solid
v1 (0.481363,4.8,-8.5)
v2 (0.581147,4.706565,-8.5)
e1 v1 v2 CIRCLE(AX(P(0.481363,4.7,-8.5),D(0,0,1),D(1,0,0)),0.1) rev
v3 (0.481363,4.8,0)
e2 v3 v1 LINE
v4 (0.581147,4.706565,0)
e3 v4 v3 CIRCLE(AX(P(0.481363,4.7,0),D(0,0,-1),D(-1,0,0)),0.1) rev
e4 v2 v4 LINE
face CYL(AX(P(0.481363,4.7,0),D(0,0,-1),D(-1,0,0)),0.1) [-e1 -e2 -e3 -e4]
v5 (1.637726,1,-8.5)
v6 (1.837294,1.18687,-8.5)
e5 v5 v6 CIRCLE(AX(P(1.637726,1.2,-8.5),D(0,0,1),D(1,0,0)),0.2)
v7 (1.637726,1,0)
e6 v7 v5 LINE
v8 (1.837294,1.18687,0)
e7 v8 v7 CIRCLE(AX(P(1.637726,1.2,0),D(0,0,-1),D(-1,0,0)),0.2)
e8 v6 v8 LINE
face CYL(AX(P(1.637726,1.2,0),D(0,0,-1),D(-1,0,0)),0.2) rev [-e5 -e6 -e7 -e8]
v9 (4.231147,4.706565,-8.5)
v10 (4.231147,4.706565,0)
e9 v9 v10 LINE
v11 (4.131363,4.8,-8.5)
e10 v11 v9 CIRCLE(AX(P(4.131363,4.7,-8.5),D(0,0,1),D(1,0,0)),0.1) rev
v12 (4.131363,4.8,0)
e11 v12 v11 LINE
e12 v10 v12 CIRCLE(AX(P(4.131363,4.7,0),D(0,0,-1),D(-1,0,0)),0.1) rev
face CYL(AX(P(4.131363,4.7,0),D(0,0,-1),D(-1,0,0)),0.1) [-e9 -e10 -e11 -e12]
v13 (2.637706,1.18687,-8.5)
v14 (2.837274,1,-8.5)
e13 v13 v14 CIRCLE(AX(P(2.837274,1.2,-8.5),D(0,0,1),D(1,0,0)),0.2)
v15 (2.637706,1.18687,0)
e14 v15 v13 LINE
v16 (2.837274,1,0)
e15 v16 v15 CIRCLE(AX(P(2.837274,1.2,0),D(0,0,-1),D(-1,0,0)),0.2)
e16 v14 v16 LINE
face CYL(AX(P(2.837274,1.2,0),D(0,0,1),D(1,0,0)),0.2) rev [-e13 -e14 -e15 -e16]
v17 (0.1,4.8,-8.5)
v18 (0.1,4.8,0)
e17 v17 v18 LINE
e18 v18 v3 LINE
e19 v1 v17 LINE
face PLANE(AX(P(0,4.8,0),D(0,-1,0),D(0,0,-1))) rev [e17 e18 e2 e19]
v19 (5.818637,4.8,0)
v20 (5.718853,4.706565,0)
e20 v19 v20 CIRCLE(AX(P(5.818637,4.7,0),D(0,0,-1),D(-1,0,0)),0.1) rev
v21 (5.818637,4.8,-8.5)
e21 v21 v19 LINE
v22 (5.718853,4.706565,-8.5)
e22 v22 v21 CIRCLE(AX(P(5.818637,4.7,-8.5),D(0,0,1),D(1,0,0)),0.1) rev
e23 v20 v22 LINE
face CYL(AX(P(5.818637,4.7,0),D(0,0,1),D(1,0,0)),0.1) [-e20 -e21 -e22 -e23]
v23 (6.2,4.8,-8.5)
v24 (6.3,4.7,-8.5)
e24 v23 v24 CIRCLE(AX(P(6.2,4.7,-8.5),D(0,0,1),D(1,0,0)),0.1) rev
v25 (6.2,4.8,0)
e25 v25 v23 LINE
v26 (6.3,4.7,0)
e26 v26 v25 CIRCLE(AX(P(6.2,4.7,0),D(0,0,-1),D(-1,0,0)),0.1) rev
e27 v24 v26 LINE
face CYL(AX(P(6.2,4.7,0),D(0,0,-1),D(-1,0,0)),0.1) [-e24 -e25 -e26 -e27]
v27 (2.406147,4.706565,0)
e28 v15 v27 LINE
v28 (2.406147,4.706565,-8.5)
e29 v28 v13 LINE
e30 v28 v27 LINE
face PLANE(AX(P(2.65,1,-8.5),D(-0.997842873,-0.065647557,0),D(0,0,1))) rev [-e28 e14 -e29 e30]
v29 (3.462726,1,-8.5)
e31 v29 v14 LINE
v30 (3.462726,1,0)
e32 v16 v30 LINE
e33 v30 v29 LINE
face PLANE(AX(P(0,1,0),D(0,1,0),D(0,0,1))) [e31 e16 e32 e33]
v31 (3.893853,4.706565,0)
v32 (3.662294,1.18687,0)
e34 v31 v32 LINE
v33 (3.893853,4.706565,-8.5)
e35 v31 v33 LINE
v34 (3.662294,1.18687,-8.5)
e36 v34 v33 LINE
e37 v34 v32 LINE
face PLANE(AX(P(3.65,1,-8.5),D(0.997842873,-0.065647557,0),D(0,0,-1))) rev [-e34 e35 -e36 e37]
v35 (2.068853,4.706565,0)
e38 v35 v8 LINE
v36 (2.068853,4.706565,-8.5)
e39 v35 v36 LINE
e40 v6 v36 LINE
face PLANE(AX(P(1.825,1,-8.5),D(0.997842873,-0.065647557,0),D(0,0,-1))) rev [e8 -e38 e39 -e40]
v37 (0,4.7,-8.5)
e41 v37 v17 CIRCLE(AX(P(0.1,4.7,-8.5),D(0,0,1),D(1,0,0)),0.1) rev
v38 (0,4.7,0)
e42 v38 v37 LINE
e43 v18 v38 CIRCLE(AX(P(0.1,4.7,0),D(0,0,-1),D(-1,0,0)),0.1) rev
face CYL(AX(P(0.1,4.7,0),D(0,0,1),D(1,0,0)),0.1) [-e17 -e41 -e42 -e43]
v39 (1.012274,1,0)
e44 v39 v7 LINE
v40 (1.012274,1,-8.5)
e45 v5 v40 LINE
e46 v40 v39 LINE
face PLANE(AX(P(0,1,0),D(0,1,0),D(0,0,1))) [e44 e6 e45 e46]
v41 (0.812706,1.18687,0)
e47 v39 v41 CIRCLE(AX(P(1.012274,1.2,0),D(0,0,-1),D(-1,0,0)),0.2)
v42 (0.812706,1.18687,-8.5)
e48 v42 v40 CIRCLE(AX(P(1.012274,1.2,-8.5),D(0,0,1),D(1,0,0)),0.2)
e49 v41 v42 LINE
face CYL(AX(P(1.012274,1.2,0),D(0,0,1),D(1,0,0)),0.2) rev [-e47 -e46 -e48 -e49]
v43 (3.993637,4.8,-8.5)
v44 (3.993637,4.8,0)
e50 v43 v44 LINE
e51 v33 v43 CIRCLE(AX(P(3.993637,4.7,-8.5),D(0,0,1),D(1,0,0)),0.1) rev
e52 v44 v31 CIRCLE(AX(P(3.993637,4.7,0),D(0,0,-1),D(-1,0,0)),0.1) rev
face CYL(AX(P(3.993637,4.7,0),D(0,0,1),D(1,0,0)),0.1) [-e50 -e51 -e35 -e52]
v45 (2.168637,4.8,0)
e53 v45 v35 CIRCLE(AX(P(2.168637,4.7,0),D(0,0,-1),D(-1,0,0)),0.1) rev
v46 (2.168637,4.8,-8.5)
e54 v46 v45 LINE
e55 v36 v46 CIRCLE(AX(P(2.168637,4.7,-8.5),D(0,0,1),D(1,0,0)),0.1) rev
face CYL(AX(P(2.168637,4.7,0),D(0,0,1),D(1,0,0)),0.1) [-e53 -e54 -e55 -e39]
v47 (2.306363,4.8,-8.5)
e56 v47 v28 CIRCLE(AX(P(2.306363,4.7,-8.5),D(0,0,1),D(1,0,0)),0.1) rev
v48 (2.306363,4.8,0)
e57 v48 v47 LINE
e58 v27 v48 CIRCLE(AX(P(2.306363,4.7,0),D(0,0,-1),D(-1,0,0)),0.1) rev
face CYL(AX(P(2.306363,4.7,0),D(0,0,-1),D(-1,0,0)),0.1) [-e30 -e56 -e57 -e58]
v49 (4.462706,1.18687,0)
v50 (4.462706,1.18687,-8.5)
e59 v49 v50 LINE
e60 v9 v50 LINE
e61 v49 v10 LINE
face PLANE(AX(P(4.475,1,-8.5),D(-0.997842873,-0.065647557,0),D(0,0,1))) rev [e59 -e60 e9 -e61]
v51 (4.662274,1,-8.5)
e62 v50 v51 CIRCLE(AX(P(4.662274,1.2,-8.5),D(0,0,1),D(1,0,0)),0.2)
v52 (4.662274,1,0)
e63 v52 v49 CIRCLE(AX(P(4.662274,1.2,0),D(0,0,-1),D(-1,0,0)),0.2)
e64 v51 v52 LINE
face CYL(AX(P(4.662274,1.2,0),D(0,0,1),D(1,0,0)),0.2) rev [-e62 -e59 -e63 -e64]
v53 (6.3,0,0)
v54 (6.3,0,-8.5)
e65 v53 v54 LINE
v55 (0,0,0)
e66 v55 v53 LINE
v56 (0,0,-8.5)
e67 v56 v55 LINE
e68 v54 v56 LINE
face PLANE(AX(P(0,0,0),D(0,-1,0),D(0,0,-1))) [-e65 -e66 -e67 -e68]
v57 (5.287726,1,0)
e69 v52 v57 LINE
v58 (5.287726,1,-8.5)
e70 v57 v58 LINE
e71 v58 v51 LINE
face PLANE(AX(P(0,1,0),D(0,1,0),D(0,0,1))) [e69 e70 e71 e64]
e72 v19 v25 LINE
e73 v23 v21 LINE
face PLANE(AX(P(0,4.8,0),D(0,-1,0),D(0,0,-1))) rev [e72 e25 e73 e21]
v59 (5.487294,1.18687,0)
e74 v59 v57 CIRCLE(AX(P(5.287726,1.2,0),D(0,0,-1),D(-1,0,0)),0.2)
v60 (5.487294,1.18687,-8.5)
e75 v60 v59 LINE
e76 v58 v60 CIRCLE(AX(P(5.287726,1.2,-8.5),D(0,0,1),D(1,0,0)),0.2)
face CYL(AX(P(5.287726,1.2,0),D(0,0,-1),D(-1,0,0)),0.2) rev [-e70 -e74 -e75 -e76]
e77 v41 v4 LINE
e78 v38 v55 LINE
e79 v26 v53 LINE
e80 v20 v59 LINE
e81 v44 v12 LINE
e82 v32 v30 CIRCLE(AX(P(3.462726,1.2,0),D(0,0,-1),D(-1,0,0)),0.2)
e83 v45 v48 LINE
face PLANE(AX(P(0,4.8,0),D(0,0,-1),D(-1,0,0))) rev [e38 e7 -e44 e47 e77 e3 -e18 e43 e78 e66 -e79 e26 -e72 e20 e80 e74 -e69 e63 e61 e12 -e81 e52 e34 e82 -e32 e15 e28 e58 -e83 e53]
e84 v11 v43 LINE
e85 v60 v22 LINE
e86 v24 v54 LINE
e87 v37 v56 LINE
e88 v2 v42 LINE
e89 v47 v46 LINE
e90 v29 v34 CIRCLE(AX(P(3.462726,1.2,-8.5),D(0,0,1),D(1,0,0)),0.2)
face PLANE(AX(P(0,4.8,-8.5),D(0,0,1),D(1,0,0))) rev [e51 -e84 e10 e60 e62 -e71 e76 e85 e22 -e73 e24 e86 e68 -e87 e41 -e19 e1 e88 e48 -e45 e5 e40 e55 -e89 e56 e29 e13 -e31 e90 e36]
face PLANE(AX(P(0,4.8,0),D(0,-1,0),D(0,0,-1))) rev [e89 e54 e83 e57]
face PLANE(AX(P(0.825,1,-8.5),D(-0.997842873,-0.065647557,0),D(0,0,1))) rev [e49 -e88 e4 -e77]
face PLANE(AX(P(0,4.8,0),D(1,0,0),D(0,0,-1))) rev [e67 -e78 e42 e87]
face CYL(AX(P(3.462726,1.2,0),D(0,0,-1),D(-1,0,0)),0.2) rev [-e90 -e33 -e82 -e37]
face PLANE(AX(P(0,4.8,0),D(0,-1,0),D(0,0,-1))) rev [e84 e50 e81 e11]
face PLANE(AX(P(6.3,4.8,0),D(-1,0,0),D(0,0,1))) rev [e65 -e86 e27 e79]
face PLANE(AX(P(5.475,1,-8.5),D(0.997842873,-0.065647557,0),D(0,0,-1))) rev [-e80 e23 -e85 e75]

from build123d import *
from OCP.BRepFilletAPI import BRepFilletAPI_MakeChamfer

# Parameters (mm, degrees)
SKETCH1_W           = 6.3
SKETCH1_H           = 8.5
BOSS_EXTRUDE1_DEPTH = 4.8
SKETCH2_W           = 1
SKETCH2_H           = 8.5
CUT_EXTRUDE1_DEPTH  = 3.8
CHAMFER1_SIZE       = 3.8
CHAMFER1_SIZE_2     = 0.25
FILLET1_R           = 0.2
FILLET2_R           = 0.1


with BuildPart() as part:
    # Sketch1 → Boss-Extrude1 (new body)
    with BuildSketch(Plane(origin=(0, 0, 0), x_dir=(1, 0, 0), z_dir=(0, 1, 0))):
        with Locations((3.15, 4.25)):
            Rectangle(SKETCH1_W, SKETCH1_H)
    extrude(amount=BOSS_EXTRUDE1_DEPTH)

    # Sketch2 → Cut-Extrude1 (cut)
    with BuildSketch(Plane(origin=(0, 4.8, 0), x_dir=(1, 0, 0), z_dir=(0, 1, 0))):
        with Locations((1.325, 4.25)):
            Rectangle(SKETCH2_W, SKETCH2_H)
        with Locations((3.15, 4.25)):
            Rectangle(SKETCH2_W, SKETCH2_H)
        with Locations((4.975, 4.25)):
            Rectangle(SKETCH2_W, SKETCH2_H)
    extrude(amount=-CUT_EXTRUDE1_DEPTH, mode=Mode.SUBTRACT)

    # Chamfer1
    chamfer1_edges_1 = [part.edges().sort_by_distance(p)[0] for p in [
        (0.825, 4.8, -4.25),
    ]]
    chamfer1_side_1 = [part.faces().sort_by_distance(p)[0] for p in [
        (0.825, 4.795, -4.25),
    ]]
    chamfer1_edges_2 = [part.edges().sort_by_distance(p)[0] for p in [
        (5.475, 4.8, -4.25),
    ]]
    chamfer1_side_2 = [part.faces().sort_by_distance(p)[0] for p in [
        (5.48, 4.8, -4.25),
    ]]
    chamfer1_edges_3 = [part.edges().sort_by_distance(p)[0] for p in [
        (4.475, 4.8, -4.25),
    ]]
    chamfer1_side_3 = [part.faces().sort_by_distance(p)[0] for p in [
        (4.475, 4.795, -4.25),
    ]]
    chamfer1_edges_4 = [part.edges().sort_by_distance(p)[0] for p in [
        (3.65, 4.8, -4.25),
    ]]
    chamfer1_side_4 = [part.faces().sort_by_distance(p)[0] for p in [
        (3.655, 4.8, -4.25),
    ]]
    chamfer1_edges_5 = [part.edges().sort_by_distance(p)[0] for p in [
        (2.65, 4.8, -4.25),
    ]]
    chamfer1_side_5 = [part.faces().sort_by_distance(p)[0] for p in [
        (2.65, 4.795, -4.25),
    ]]
    chamfer1_edges_6 = [part.edges().sort_by_distance(p)[0] for p in [
        (1.825, 4.8, -4.25),
    ]]
    chamfer1_side_6 = [part.faces().sort_by_distance(p)[0] for p in [
        (1.83, 4.8, -4.25),
    ]]
    chamfer1 = BRepFilletAPI_MakeChamfer(part.part.solid().wrapped)
    for e in chamfer1_edges_1:
        chamfer1.Add(CHAMFER1_SIZE - 0.0001, CHAMFER1_SIZE_2 - 0.0001, e.wrapped, chamfer1_side_1[0].wrapped)
    for e in chamfer1_edges_2:
        chamfer1.Add(CHAMFER1_SIZE_2 - 0.0001, CHAMFER1_SIZE - 0.0001, e.wrapped, chamfer1_side_2[0].wrapped)
    for e in chamfer1_edges_3:
        chamfer1.Add(CHAMFER1_SIZE - 0.0001, CHAMFER1_SIZE_2 - 0.0001, e.wrapped, chamfer1_side_3[0].wrapped)
    for e in chamfer1_edges_4:
        chamfer1.Add(CHAMFER1_SIZE_2 - 0.0001, CHAMFER1_SIZE - 0.0001, e.wrapped, chamfer1_side_4[0].wrapped)
    for e in chamfer1_edges_5:
        chamfer1.Add(CHAMFER1_SIZE - 0.0001, CHAMFER1_SIZE_2 - 0.0001, e.wrapped, chamfer1_side_5[0].wrapped)
    for e in chamfer1_edges_6:
        chamfer1.Add(CHAMFER1_SIZE_2 - 0.0001, CHAMFER1_SIZE - 0.0001, e.wrapped, chamfer1_side_6[0].wrapped)
    add(Compound.cast(chamfer1.Shape()), mode=Mode.REPLACE)  # a hair under: the kernel refuses the full size

    # Fillet1
    fillet1_edges = [part.edges().sort_by_distance(p)[0] for p in [
        (0.825, 1, -4.25),
        (1.825, 1, -4.25),
        (2.65, 1, -4.25),
        (3.65, 1, -4.25),
        (4.475, 1, -4.25),
        (5.475, 1, -4.25),
    ]]
    fillet(fillet1_edges, radius=FILLET1_R)

    # Fillet2
    fillet2_edges = [part.edges().sort_by_distance(p)[0] for p in [
        (6.3, 4.8, -4.25),
        (0, 4.8, -4.25),
        (5.7249, 4.8, -4.25),
        (3.8999, 4.8, -4.25),
        (4.2251, 4.8, -4.25),
        (2.0749, 4.8, -4.25),
        (2.4001, 4.8, -4.25),
        (0.5751, 4.8, -4.25),
    ]]
    fillet(fillet2_edges, radius=FILLET2_R)


solid = part.part
